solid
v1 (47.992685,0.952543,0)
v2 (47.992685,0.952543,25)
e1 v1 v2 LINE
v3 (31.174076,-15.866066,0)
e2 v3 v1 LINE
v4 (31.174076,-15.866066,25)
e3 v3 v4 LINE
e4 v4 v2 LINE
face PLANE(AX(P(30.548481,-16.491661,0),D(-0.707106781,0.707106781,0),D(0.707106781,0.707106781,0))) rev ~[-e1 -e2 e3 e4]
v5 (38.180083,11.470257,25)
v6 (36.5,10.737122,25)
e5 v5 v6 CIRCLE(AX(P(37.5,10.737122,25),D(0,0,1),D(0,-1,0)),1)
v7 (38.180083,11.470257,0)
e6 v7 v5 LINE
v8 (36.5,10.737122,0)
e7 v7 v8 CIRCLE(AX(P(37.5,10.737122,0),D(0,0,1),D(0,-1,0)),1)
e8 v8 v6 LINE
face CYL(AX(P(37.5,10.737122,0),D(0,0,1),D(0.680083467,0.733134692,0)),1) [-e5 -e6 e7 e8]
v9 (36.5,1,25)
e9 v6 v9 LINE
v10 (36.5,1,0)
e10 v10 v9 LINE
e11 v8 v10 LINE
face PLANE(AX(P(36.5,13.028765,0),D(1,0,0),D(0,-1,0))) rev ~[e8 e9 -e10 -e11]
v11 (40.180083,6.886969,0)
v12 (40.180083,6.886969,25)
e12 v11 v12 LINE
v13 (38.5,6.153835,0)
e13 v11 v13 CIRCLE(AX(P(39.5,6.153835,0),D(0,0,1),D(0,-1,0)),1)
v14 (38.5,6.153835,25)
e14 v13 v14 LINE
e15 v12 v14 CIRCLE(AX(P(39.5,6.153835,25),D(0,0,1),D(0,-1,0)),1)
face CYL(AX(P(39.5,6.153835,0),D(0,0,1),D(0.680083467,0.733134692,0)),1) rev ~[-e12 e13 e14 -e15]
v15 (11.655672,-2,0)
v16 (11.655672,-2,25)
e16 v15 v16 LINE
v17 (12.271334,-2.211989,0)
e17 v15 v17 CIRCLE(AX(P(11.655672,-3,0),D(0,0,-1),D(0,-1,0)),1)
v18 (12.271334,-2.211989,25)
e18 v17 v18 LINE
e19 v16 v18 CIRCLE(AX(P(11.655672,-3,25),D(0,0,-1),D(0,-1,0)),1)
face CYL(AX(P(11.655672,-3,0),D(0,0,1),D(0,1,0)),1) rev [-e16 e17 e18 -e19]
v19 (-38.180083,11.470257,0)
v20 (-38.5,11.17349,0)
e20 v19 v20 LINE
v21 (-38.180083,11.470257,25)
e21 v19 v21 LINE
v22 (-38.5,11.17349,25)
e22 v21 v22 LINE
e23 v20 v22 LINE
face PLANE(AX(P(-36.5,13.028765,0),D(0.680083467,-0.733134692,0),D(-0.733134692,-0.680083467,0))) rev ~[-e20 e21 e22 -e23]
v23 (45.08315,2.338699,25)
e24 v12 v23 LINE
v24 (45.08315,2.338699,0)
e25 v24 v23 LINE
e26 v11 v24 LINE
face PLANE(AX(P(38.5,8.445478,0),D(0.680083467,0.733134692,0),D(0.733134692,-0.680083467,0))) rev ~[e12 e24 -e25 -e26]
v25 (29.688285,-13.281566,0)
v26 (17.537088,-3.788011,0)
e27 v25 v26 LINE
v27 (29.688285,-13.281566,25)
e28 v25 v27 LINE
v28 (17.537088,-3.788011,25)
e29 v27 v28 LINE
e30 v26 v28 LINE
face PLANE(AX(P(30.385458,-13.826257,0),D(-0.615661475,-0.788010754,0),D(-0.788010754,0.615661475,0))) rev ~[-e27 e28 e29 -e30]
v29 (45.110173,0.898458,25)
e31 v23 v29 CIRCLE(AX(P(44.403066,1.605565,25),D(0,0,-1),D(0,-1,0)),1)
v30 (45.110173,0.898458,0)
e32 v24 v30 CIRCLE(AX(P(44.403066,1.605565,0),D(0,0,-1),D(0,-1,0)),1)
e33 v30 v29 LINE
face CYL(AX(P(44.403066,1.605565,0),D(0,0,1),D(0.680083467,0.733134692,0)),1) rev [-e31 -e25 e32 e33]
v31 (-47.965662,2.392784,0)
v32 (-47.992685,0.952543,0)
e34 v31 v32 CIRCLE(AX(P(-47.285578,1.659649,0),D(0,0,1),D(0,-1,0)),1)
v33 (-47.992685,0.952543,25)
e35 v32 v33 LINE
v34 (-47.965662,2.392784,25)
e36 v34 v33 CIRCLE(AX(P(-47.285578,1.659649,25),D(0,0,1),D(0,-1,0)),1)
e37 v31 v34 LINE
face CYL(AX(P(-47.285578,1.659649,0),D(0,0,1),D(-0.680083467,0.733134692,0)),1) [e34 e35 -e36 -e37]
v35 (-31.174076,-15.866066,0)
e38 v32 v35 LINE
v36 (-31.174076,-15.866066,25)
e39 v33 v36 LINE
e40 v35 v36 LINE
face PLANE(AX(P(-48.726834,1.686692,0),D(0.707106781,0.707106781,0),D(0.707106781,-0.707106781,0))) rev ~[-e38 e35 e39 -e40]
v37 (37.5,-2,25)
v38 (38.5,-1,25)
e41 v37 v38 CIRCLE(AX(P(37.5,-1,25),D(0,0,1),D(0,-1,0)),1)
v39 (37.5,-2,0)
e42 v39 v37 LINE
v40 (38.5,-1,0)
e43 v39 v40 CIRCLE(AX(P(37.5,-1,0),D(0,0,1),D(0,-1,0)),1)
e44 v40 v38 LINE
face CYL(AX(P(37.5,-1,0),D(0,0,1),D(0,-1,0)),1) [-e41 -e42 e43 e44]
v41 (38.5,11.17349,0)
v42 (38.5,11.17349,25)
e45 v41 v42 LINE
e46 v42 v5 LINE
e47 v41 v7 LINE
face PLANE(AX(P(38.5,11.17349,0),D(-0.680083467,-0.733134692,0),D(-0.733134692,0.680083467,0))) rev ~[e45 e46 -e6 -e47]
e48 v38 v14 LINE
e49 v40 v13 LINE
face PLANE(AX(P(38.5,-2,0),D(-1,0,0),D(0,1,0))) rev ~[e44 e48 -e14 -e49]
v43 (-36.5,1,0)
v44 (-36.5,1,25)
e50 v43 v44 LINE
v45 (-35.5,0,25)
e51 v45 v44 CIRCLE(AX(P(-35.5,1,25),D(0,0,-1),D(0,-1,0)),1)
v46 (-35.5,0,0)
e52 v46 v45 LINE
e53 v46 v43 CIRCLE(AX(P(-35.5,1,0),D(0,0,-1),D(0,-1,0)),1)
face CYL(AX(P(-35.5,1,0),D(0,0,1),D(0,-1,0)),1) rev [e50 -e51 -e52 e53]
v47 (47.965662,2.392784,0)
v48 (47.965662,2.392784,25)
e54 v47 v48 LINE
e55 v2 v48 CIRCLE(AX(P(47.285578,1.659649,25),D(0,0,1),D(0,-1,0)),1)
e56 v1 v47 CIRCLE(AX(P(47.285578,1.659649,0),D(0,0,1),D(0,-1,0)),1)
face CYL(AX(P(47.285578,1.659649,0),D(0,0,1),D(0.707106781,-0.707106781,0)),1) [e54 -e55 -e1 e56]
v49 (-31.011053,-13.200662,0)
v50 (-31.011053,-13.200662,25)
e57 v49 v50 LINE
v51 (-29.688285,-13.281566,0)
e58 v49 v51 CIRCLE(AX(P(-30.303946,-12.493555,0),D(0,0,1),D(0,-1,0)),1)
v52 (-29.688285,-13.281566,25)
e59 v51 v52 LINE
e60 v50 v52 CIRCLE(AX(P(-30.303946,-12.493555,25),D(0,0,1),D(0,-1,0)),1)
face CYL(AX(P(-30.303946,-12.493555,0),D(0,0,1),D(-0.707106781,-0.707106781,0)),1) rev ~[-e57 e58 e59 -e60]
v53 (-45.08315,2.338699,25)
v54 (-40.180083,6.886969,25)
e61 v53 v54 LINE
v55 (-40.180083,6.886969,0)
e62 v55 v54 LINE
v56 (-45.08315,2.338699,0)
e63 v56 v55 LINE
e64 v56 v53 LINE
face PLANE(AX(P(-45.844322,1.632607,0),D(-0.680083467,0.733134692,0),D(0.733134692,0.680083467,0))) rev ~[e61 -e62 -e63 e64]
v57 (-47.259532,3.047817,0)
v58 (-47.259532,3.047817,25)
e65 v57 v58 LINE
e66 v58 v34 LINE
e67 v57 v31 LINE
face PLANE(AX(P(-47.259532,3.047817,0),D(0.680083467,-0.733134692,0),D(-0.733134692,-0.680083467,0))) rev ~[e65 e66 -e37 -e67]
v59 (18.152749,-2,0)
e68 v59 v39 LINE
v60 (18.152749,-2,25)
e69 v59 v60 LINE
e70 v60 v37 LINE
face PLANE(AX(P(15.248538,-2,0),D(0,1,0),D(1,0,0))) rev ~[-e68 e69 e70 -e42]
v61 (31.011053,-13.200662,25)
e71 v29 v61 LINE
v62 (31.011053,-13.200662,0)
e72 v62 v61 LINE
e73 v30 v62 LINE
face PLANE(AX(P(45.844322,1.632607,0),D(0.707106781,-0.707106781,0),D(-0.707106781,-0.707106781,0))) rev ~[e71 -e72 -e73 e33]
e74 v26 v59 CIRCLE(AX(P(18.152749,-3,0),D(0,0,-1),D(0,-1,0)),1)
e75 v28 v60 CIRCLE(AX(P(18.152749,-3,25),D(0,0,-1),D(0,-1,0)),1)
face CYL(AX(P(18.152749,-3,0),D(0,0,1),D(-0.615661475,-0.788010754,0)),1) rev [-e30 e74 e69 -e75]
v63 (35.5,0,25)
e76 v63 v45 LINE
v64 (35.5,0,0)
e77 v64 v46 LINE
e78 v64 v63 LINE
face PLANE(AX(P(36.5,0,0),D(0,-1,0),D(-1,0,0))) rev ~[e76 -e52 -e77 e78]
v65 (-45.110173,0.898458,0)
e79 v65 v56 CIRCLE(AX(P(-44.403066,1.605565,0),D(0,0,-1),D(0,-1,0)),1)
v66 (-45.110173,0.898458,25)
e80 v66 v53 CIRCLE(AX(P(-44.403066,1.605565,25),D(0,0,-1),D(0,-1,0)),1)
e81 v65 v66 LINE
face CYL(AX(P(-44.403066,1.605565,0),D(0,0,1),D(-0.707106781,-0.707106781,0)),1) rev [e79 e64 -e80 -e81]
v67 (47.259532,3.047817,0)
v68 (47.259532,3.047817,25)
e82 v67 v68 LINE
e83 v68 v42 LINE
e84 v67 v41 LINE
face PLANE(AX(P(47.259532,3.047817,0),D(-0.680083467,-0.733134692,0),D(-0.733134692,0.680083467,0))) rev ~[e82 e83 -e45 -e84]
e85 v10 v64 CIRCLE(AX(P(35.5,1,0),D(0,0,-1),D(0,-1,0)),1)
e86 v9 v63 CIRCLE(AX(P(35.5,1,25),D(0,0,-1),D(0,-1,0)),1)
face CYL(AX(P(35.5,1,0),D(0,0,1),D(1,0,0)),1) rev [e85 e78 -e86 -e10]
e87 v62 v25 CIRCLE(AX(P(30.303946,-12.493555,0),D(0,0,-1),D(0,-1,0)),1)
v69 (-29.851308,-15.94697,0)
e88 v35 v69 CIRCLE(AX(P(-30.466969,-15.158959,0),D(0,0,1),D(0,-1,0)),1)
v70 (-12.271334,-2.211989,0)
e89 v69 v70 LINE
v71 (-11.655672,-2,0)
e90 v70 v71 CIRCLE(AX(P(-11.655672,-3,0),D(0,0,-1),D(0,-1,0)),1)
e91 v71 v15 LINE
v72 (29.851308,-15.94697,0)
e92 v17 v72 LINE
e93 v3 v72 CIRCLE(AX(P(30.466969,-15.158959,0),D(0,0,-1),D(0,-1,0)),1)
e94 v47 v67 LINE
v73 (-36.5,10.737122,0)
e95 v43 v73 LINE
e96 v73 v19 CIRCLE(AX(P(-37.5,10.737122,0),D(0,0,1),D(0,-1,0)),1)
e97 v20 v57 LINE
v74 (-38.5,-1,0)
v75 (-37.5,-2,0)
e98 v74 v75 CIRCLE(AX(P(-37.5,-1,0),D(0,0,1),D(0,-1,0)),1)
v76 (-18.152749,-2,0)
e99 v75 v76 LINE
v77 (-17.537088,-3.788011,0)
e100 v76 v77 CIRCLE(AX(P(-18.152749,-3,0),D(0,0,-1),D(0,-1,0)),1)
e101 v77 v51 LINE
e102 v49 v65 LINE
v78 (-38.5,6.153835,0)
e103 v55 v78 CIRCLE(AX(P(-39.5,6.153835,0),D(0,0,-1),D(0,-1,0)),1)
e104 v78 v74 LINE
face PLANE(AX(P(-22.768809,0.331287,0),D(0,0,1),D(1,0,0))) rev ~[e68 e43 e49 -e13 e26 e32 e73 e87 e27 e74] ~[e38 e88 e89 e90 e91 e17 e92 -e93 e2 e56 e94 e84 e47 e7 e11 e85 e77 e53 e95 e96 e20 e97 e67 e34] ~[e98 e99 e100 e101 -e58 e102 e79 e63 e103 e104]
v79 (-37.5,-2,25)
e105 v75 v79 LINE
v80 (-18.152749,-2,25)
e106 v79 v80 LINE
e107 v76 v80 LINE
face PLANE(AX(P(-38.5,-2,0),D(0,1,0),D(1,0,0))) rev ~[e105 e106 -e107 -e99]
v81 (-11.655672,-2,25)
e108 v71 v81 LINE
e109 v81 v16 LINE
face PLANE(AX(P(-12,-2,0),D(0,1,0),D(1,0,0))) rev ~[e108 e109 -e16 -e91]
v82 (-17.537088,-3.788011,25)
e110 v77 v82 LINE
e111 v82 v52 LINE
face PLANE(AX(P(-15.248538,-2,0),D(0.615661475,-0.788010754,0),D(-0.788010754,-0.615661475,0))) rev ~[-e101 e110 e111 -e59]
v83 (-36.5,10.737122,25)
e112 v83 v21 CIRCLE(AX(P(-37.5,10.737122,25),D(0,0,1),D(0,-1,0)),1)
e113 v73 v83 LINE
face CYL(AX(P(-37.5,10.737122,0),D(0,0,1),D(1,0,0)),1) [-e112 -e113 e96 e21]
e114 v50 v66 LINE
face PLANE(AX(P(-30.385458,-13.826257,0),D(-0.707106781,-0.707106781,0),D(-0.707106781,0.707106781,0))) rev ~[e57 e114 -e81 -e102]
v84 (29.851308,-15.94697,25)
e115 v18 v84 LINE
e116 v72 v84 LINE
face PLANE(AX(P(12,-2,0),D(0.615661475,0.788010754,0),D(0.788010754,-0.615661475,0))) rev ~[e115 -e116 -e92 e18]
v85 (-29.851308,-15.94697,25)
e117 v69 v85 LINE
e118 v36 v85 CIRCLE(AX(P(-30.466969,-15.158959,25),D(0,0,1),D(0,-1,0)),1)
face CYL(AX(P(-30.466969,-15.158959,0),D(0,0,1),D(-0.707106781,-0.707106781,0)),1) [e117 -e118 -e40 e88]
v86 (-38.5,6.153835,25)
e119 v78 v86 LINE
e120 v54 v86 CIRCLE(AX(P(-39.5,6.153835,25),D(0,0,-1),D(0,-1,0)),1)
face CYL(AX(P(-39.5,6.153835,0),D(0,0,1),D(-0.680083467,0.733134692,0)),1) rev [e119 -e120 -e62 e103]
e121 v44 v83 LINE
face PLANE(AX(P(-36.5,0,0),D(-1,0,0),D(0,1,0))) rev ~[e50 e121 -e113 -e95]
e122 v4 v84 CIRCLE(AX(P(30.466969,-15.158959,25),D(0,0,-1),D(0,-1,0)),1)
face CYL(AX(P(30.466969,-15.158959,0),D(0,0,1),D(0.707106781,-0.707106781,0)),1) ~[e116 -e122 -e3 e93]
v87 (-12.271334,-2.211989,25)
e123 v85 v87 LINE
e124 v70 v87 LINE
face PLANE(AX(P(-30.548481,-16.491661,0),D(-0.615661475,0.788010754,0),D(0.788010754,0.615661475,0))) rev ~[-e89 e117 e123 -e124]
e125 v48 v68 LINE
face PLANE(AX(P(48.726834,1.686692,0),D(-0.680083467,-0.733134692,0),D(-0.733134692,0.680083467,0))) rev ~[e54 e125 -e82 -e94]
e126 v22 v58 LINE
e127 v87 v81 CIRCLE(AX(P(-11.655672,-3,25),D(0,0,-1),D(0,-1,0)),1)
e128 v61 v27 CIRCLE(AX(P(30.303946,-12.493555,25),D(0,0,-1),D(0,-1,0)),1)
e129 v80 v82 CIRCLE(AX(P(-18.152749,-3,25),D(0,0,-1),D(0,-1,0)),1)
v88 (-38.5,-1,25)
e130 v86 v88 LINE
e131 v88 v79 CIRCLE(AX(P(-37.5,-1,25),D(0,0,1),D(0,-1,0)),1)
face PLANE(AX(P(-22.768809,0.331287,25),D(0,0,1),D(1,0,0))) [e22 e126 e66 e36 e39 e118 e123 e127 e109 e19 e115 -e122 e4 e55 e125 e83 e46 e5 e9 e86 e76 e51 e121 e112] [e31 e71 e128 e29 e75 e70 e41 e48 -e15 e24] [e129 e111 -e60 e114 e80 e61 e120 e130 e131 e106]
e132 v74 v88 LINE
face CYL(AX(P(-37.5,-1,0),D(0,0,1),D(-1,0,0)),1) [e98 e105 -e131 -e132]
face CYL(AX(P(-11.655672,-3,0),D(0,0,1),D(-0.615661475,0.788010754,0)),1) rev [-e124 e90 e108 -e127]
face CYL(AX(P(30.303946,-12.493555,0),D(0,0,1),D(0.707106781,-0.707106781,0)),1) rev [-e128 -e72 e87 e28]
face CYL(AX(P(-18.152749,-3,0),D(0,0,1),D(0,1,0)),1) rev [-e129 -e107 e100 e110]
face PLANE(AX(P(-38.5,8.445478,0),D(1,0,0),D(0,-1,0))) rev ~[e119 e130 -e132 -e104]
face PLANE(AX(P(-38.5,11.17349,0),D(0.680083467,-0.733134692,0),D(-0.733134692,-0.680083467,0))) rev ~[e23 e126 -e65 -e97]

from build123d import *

# Parameters (mm, degrees)
F1_DEPTH = 25
F2_R     = 1


# Not quite as in the source:
# - a feature names something its author has since deleted; it is built from what else it names


with BuildPart() as f1:
    # F0 (on Top) → F1 (new body)
    with BuildSketch(Plane.XY):
        Polygon((0, -2), (0, 0), (-36.5, 0), (-36.5, 10.3007538181), (-38.5, 8.4454781792), (-38.5, -2), (-15.248538491, -2), (-12, -2), align=None)
        Polygon((36.5, 0), (0, 0), (0, -2), (12, -2), (15.248538491, -2), (38.5, -2), (38.5, 8.4454781792), (36.5, 10.3007538181), align=None)
        Polygon((-38.5, 8.4454781792), (-36.5, 10.3007538181), (-36.5, 13.0287654926), (-38.5, 11.1734898537), align=None)
        Polygon((-30.5484807652, -16.4916614154), (-12, -2), (-15.248538491, -2), (-30.3854576709, -13.8262573849), (-45.844322202, 1.6326071462), (-47.3116243561, 0.2714821755), align=None)
        Polygon((15.248538491, -2), (12, -2), (30.5484807652, -16.4916614154), (47.3116243561, 0.2714821755), (45.844322202, 1.6326071462), (30.3854576709, -13.8262573849), align=None)
        Polygon((36.5, 13.0287654926), (36.5, 10.3007538181), (38.5, 8.4454781792), (38.5, 11.1734898537), align=None)
        Polygon((-45.844322202, 1.6326071462), (-38.5, 8.4454781792), (-38.5, 11.1734898537), (-47.259531868, 3.0478168121), align=None)
        Polygon((38.5, 11.1734898537), (38.5, 8.4454781792), (45.844322202, 1.6326071462), (47.259531868, 3.0478168121), align=None)
        Polygon((-47.3116243561, 0.2714821755), (-45.844322202, 1.6326071462), (-47.259531868, 3.0478168121), (-48.726834022, 1.6866918414), align=None)
        Polygon((45.844322202, 1.6326071462), (47.3116243561, 0.2714821755), (48.726834022, 1.6866918414), (47.259531868, 3.0478168121), align=None)
    extrude(amount=F1_DEPTH)

    # F2
    f2_edges = [f1.edges().sort_by_distance(p)[0] for p in [
        (-36.5, 0, 12.5),
        (-38.5, -2, 12.5),
        (-15.248538, -2, 12.5),
        (15.248538, -2, 12.5),
        (30.385458, -13.826257, 12.5),
        (38.5, -2, 12.5),
        (38.5, 8.445478, 12.5),
        (45.844322, 1.632607, 12.5),
        (12, -2, 12.5),
        (30.548481, -16.491661, 12.5),
        (36.5, 13.028765, 12.5),
        (36.5, 0, 12.5),
        (48.726834, 1.686692, 12.5),
        (-45.844322, 1.632607, 12.5),
        (-48.726834, 1.686692, 12.5),
        (-36.5, 13.028765, 12.5),
        (-30.548481, -16.491661, 12.5),
        (-12, -2, 12.5),
        (-30.385458, -13.826257, 12.5),
        (-38.5, 8.445478, 12.5),
    ]]
    fillet(f2_edges, radius=F2_R)


solid = f1.part
